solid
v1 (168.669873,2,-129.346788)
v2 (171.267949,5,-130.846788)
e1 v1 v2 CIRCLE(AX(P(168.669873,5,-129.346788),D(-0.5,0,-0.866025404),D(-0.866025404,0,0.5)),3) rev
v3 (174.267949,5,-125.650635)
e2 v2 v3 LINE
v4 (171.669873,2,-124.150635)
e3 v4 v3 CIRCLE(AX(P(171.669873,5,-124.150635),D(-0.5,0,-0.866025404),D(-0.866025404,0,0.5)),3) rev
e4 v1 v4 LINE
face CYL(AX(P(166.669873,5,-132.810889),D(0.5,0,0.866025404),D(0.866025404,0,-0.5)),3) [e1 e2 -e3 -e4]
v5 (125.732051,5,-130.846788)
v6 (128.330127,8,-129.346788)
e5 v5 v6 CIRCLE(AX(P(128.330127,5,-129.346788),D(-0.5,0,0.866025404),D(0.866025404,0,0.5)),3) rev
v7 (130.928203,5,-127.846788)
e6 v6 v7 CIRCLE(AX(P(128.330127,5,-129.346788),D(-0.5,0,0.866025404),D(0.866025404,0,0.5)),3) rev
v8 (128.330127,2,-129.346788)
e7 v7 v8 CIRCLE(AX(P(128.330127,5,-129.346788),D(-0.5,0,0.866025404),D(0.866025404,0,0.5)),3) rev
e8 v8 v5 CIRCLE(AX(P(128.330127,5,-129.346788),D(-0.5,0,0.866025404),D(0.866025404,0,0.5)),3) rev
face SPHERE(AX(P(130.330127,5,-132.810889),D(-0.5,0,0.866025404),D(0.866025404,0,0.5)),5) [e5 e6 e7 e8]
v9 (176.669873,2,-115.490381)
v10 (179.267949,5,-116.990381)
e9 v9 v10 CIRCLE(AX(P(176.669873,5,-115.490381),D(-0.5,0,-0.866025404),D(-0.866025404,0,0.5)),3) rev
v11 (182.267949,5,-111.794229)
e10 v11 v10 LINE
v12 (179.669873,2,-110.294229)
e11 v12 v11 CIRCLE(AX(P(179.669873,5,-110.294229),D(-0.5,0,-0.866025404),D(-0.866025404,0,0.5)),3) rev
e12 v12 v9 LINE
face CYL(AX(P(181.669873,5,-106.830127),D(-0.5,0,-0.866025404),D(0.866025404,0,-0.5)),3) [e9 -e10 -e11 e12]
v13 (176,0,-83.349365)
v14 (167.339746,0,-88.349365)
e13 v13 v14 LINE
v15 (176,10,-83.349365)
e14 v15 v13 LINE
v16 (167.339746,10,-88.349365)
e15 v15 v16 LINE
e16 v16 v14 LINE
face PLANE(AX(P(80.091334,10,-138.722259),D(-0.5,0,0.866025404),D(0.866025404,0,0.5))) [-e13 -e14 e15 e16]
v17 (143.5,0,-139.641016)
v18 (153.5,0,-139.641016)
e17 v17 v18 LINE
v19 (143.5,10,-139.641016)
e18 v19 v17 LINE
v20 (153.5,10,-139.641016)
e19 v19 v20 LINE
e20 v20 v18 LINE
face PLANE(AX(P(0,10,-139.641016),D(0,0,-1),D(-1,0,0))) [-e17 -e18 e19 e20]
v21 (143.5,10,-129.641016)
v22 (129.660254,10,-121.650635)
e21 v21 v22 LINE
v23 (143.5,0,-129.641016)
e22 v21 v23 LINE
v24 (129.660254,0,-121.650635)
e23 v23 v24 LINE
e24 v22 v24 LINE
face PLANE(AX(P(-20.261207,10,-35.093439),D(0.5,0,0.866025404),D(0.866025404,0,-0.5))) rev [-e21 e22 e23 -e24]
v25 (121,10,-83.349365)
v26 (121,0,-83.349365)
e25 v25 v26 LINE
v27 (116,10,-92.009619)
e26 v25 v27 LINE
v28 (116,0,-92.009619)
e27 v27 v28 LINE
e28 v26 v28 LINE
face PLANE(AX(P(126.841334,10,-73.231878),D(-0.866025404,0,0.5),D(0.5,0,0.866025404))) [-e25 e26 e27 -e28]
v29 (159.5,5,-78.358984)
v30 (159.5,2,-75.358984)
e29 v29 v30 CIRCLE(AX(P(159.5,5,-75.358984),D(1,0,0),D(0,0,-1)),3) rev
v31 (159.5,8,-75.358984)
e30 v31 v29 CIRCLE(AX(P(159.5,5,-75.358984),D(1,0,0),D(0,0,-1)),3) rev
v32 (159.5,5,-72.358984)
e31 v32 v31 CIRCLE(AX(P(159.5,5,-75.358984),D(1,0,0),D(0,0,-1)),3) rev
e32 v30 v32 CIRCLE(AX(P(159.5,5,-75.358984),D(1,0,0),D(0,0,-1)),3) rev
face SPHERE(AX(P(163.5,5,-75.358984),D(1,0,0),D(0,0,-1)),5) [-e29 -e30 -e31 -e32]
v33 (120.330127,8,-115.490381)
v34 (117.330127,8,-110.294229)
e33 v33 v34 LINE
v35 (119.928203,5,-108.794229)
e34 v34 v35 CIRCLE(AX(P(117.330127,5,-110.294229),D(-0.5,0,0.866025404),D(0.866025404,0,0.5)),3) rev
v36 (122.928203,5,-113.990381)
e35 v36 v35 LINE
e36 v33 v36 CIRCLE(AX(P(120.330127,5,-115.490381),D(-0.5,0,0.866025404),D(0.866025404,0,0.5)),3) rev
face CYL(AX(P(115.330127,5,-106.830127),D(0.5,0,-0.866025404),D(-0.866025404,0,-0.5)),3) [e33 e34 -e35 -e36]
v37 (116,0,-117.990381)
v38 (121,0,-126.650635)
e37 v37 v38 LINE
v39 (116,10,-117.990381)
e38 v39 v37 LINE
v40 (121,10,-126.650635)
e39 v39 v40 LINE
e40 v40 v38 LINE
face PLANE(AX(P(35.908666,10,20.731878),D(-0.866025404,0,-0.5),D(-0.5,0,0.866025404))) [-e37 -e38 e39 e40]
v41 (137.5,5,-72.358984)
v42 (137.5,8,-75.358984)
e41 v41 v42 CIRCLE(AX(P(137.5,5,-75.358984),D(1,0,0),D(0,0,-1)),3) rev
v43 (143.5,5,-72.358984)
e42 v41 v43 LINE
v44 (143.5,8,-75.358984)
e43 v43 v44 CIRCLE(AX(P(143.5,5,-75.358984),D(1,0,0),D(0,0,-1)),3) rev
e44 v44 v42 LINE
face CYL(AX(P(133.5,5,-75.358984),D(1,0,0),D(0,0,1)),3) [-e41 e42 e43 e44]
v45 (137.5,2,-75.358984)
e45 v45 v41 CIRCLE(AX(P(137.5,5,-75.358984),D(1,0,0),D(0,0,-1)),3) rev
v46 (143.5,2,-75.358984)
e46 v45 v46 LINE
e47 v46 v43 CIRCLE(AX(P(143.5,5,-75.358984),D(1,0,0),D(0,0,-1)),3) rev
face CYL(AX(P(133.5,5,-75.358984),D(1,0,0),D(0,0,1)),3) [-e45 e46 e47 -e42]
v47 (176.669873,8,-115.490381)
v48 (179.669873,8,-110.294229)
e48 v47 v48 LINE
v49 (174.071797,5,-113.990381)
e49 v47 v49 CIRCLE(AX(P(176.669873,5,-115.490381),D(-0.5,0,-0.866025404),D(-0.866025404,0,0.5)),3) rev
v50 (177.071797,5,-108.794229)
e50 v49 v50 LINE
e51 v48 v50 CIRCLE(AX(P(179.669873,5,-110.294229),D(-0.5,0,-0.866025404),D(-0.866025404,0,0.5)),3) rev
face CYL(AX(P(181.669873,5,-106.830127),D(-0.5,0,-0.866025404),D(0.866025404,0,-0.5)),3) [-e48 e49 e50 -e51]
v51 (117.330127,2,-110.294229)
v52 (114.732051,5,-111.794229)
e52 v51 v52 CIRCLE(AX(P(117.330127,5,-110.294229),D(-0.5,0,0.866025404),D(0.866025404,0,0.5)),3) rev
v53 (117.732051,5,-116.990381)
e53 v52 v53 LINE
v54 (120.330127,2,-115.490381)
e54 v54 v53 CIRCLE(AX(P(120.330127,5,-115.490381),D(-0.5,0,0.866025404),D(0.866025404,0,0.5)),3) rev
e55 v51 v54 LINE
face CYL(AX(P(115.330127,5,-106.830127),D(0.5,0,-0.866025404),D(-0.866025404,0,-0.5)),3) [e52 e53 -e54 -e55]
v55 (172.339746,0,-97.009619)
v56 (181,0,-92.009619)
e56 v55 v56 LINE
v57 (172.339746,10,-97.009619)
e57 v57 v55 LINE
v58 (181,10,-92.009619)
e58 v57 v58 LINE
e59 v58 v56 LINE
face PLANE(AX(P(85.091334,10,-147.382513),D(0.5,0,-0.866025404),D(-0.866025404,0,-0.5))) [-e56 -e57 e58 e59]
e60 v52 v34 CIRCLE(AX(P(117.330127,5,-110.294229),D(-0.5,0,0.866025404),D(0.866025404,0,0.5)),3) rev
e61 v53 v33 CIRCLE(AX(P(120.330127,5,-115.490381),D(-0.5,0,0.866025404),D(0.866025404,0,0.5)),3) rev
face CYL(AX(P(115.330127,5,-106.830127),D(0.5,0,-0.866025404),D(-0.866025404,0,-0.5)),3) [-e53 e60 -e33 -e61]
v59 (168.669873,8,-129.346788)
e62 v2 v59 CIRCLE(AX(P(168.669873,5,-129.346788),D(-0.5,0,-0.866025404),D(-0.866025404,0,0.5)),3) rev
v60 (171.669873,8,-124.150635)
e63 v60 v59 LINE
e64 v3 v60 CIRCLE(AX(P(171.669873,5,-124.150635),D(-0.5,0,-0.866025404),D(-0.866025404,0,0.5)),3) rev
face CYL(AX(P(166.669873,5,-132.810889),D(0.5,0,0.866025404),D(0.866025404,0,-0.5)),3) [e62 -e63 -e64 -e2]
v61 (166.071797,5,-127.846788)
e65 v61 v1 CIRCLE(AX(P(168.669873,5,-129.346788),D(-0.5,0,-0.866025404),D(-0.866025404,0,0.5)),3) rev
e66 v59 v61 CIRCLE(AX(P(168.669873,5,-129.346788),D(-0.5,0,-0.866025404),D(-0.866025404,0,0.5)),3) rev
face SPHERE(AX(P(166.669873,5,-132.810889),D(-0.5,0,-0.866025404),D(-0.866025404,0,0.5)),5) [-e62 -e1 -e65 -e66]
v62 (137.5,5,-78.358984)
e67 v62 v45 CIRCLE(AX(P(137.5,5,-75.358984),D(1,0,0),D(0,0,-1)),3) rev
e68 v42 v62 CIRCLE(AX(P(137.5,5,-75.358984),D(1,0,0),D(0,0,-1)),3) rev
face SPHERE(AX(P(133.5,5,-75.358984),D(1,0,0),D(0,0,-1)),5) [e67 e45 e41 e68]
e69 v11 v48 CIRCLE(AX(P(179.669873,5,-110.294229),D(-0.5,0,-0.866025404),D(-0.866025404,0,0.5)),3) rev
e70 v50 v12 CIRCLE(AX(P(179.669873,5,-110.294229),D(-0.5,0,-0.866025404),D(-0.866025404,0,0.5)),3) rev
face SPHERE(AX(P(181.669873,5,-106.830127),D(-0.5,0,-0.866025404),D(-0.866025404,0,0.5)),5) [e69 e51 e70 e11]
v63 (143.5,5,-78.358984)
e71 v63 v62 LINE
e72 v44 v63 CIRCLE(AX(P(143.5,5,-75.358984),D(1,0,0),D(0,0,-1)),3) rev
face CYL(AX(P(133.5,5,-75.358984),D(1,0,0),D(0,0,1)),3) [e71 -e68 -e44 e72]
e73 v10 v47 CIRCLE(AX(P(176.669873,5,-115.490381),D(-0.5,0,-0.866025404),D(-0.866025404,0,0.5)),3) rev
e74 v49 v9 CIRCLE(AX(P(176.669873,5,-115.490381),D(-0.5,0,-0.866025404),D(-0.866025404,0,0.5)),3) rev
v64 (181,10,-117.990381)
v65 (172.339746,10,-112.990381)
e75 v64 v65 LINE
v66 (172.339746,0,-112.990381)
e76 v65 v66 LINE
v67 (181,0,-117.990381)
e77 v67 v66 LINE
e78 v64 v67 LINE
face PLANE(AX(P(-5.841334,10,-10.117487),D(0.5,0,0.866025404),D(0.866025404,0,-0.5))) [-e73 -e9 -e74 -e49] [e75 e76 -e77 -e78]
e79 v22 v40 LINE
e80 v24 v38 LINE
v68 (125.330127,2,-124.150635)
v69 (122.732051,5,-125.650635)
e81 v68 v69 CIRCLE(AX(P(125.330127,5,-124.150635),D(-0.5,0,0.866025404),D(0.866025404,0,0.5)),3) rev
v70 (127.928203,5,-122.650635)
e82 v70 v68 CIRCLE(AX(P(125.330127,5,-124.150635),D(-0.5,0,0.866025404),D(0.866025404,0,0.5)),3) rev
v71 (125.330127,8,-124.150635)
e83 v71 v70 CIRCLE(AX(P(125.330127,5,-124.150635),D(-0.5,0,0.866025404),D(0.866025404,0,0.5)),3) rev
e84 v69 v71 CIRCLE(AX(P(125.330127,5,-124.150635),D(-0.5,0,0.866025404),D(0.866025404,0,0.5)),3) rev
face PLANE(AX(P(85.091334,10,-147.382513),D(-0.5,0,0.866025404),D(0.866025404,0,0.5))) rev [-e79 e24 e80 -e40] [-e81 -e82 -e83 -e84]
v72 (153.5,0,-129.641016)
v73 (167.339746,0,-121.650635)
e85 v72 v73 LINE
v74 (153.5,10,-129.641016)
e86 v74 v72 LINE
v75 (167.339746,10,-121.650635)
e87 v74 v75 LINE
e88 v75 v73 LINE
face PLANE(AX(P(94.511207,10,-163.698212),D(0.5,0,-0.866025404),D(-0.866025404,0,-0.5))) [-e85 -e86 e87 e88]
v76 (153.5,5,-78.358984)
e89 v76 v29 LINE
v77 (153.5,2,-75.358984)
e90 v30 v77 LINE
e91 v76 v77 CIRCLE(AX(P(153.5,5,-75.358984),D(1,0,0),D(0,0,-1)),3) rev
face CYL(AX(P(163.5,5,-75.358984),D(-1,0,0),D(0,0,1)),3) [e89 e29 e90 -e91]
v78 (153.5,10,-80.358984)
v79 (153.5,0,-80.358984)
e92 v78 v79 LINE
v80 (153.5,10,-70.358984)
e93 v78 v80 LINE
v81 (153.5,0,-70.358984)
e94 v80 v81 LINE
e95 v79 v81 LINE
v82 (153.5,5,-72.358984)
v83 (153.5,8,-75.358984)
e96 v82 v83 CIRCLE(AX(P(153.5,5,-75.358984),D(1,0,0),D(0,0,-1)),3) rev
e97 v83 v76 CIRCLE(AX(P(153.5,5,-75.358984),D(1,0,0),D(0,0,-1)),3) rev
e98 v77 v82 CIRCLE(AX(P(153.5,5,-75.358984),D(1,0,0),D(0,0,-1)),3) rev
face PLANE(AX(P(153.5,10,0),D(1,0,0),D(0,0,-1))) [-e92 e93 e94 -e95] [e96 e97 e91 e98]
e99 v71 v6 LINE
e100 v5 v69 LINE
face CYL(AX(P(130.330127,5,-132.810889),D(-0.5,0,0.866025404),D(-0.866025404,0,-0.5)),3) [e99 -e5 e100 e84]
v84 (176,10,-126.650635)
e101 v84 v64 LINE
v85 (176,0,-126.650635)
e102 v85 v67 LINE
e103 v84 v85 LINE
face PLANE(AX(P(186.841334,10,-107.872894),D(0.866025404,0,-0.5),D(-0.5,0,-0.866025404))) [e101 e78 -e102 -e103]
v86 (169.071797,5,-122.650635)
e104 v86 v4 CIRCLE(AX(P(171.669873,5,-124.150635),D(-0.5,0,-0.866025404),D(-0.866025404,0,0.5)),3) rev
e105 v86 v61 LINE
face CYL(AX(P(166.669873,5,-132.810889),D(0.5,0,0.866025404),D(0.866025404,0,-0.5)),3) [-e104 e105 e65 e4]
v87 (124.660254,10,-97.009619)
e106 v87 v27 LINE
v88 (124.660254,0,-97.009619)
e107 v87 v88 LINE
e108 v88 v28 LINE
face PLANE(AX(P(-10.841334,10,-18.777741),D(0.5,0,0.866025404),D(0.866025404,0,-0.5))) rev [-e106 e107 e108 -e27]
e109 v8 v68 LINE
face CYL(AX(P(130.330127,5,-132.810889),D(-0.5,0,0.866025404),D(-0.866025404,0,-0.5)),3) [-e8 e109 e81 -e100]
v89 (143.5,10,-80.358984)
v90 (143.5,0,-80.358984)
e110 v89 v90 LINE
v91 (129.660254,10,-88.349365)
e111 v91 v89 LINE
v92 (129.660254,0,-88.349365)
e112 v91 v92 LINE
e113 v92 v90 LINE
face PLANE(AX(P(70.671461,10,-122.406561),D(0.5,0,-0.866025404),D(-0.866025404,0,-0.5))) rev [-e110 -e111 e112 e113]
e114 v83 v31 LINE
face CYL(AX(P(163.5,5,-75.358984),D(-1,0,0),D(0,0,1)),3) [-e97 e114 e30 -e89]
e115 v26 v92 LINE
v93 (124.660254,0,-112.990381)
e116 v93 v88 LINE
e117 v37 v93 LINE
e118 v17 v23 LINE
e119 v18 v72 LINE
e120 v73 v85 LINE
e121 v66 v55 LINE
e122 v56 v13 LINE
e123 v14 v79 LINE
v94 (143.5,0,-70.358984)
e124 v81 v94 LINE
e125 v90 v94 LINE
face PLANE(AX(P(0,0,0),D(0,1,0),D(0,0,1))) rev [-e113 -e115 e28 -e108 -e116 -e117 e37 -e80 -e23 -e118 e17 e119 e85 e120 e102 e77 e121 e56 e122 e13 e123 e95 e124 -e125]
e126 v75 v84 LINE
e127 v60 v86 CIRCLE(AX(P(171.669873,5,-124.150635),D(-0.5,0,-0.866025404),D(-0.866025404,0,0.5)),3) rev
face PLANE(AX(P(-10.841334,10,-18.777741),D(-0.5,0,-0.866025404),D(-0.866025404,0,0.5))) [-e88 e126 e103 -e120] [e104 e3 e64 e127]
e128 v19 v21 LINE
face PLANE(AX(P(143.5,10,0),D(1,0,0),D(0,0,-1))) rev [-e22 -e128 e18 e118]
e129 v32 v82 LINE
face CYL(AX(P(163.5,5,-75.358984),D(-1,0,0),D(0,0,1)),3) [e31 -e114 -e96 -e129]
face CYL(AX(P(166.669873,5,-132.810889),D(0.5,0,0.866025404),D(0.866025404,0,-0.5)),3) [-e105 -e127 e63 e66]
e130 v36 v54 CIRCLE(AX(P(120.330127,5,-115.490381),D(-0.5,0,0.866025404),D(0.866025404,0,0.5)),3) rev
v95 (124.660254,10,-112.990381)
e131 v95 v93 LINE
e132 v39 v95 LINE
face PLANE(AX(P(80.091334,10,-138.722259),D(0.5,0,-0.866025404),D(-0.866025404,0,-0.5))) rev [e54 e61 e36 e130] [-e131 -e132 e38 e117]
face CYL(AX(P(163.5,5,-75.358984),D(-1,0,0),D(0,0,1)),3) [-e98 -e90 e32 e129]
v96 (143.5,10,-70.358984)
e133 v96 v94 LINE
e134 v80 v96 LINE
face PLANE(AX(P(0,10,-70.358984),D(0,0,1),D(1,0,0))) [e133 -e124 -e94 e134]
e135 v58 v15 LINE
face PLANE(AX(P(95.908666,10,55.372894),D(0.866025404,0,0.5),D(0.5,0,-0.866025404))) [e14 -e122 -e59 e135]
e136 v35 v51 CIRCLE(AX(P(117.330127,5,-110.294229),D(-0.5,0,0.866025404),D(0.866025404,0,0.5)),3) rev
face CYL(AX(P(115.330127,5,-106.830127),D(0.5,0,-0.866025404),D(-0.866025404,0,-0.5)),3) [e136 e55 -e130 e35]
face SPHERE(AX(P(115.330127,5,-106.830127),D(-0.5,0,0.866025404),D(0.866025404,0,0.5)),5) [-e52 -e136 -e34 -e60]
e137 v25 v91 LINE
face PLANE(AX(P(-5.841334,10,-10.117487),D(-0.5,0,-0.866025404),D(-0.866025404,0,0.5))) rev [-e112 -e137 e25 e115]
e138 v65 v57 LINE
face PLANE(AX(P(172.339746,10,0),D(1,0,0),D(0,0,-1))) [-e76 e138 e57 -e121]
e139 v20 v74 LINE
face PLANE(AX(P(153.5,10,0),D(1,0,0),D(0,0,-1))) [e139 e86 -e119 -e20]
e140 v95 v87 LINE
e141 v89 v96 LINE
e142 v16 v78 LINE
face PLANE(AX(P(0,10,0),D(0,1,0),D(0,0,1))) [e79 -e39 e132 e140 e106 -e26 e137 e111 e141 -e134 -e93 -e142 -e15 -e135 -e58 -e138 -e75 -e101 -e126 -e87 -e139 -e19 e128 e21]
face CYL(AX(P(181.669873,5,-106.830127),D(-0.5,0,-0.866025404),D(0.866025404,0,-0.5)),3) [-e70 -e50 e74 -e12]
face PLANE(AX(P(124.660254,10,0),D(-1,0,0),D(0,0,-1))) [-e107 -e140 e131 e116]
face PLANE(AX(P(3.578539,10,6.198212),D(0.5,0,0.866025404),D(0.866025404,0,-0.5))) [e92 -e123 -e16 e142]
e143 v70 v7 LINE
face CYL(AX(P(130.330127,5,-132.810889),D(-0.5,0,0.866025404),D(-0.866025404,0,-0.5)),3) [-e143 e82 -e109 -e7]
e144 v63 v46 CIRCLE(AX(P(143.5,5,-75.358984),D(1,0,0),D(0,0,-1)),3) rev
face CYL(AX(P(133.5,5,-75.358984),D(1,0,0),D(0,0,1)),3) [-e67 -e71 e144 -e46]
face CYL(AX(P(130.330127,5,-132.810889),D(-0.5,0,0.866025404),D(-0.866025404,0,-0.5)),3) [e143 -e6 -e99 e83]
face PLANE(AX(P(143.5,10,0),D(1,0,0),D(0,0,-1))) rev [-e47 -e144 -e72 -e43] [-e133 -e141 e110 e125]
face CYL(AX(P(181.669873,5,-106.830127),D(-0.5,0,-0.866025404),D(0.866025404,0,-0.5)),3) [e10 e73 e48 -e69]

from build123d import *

# Parameters (mm, degrees)
BOSS_EXTRUDE1_DEPTH = 10
SKETCH3_W           = 6
SKETCH3_H           = 6
BOSS_EXTRUDE2_DEPTH = 10
FILLET1_R           = 3


with BuildPart() as part:
    # Sketch2 → Boss-Extrude1 (new body)
    with BuildSketch(Plane(origin=(0, 0, 0), x_dir=(1, 0, 0), z_dir=(0, 1, 0))):
        Polygon((153.500000001, 139.641016152), (143.5, 139.641016152), (143.5, 129.641016152), (129.660254038, 121.650635095), (121, 126.650635095), (116, 117.990381057), (128.990381057, 110.490381057), (124.660254038, 97.009618943), (116, 92.009618943), (121, 83.349364905), (129.660254038, 88.349364905), (143.499999999, 80.358983848), (143.499999999, 70.358983848), (153.5, 70.358983848), (153.5, 80.358983848), (167.339745962, 88.349364905), (176, 83.349364905), (181, 92.009618944), (172.339745963, 97.009618944), (172.339745963, 112.990381057), (181.000000001, 117.990381057), (176.000000001, 126.650635095), (167.339745963, 121.650635095), (153.500000001, 129.641016152), align=None)
    extrude(amount=BOSS_EXTRUDE1_DEPTH)

    # Sketch3 → Boss-Extrude2 (add)
    with BuildSketch(Plane(origin=(153.5, 0, 0), x_dir=(0, 0, -1), z_dir=(1, 0, 0))):
        with Locations((75.358983848, 5)):
            Rectangle(SKETCH3_W, SKETCH3_H)
    extrude(amount=BOSS_EXTRUDE2_DEPTH)

    # Fillet1
    fillet1_edges = [part.edges().sort_by_distance(p)[0] for p in [
        (158.5, 8, -72.358983848),
        (158.5, 2, -72.358983848),
        (158.5, 2, -78.358983848),
        (158.5, 8, -78.358983848),
    ]]
    fillet(fillet1_edges, radius=FILLET1_R - 0.0001)  # a hair under: the kernel refuses the full size

    # Sketch4 → Revolve1 (revolve)
    with BuildSketch(Plane(origin=(163.5, 0, 0), x_dir=(0, 0, -1), z_dir=(1, 0, 0))):
        with BuildLine():
            Line((70.358983848, 5), (80.358983848, 5))
            ThreePointArc((80.358983848, 5), (75.358983848, 10), (70.358983848, 5))
        make_face()
    revolve(axis=Axis((163.5, 5, -70.358983848), (0, 0, -1)))

    # Mirror1: part across plane


with BuildPart() as part_1:
    add(part.part)
    add(part.part.mirror(Plane.ZY.offset(-148.500000001)))

    # Mirror2: part across plane


with BuildPart() as part_2:
    add(part_1.part)
    add(part_1.part.mirror(Plane(origin=(-8.3413337, 0, -14.447613772), x_dir=(-0.8660254037935928, 0, 0.4999999999841444), z_dir=(0.4999999999841445, 0, 0.8660254037935928))))

    # Mirror3: part across plane


with BuildPart() as part_3:
    add(part_2.part)
    add(part_2.part.mirror(Plane.ZY.offset(-148.500000001)))


solid = part_3.part
